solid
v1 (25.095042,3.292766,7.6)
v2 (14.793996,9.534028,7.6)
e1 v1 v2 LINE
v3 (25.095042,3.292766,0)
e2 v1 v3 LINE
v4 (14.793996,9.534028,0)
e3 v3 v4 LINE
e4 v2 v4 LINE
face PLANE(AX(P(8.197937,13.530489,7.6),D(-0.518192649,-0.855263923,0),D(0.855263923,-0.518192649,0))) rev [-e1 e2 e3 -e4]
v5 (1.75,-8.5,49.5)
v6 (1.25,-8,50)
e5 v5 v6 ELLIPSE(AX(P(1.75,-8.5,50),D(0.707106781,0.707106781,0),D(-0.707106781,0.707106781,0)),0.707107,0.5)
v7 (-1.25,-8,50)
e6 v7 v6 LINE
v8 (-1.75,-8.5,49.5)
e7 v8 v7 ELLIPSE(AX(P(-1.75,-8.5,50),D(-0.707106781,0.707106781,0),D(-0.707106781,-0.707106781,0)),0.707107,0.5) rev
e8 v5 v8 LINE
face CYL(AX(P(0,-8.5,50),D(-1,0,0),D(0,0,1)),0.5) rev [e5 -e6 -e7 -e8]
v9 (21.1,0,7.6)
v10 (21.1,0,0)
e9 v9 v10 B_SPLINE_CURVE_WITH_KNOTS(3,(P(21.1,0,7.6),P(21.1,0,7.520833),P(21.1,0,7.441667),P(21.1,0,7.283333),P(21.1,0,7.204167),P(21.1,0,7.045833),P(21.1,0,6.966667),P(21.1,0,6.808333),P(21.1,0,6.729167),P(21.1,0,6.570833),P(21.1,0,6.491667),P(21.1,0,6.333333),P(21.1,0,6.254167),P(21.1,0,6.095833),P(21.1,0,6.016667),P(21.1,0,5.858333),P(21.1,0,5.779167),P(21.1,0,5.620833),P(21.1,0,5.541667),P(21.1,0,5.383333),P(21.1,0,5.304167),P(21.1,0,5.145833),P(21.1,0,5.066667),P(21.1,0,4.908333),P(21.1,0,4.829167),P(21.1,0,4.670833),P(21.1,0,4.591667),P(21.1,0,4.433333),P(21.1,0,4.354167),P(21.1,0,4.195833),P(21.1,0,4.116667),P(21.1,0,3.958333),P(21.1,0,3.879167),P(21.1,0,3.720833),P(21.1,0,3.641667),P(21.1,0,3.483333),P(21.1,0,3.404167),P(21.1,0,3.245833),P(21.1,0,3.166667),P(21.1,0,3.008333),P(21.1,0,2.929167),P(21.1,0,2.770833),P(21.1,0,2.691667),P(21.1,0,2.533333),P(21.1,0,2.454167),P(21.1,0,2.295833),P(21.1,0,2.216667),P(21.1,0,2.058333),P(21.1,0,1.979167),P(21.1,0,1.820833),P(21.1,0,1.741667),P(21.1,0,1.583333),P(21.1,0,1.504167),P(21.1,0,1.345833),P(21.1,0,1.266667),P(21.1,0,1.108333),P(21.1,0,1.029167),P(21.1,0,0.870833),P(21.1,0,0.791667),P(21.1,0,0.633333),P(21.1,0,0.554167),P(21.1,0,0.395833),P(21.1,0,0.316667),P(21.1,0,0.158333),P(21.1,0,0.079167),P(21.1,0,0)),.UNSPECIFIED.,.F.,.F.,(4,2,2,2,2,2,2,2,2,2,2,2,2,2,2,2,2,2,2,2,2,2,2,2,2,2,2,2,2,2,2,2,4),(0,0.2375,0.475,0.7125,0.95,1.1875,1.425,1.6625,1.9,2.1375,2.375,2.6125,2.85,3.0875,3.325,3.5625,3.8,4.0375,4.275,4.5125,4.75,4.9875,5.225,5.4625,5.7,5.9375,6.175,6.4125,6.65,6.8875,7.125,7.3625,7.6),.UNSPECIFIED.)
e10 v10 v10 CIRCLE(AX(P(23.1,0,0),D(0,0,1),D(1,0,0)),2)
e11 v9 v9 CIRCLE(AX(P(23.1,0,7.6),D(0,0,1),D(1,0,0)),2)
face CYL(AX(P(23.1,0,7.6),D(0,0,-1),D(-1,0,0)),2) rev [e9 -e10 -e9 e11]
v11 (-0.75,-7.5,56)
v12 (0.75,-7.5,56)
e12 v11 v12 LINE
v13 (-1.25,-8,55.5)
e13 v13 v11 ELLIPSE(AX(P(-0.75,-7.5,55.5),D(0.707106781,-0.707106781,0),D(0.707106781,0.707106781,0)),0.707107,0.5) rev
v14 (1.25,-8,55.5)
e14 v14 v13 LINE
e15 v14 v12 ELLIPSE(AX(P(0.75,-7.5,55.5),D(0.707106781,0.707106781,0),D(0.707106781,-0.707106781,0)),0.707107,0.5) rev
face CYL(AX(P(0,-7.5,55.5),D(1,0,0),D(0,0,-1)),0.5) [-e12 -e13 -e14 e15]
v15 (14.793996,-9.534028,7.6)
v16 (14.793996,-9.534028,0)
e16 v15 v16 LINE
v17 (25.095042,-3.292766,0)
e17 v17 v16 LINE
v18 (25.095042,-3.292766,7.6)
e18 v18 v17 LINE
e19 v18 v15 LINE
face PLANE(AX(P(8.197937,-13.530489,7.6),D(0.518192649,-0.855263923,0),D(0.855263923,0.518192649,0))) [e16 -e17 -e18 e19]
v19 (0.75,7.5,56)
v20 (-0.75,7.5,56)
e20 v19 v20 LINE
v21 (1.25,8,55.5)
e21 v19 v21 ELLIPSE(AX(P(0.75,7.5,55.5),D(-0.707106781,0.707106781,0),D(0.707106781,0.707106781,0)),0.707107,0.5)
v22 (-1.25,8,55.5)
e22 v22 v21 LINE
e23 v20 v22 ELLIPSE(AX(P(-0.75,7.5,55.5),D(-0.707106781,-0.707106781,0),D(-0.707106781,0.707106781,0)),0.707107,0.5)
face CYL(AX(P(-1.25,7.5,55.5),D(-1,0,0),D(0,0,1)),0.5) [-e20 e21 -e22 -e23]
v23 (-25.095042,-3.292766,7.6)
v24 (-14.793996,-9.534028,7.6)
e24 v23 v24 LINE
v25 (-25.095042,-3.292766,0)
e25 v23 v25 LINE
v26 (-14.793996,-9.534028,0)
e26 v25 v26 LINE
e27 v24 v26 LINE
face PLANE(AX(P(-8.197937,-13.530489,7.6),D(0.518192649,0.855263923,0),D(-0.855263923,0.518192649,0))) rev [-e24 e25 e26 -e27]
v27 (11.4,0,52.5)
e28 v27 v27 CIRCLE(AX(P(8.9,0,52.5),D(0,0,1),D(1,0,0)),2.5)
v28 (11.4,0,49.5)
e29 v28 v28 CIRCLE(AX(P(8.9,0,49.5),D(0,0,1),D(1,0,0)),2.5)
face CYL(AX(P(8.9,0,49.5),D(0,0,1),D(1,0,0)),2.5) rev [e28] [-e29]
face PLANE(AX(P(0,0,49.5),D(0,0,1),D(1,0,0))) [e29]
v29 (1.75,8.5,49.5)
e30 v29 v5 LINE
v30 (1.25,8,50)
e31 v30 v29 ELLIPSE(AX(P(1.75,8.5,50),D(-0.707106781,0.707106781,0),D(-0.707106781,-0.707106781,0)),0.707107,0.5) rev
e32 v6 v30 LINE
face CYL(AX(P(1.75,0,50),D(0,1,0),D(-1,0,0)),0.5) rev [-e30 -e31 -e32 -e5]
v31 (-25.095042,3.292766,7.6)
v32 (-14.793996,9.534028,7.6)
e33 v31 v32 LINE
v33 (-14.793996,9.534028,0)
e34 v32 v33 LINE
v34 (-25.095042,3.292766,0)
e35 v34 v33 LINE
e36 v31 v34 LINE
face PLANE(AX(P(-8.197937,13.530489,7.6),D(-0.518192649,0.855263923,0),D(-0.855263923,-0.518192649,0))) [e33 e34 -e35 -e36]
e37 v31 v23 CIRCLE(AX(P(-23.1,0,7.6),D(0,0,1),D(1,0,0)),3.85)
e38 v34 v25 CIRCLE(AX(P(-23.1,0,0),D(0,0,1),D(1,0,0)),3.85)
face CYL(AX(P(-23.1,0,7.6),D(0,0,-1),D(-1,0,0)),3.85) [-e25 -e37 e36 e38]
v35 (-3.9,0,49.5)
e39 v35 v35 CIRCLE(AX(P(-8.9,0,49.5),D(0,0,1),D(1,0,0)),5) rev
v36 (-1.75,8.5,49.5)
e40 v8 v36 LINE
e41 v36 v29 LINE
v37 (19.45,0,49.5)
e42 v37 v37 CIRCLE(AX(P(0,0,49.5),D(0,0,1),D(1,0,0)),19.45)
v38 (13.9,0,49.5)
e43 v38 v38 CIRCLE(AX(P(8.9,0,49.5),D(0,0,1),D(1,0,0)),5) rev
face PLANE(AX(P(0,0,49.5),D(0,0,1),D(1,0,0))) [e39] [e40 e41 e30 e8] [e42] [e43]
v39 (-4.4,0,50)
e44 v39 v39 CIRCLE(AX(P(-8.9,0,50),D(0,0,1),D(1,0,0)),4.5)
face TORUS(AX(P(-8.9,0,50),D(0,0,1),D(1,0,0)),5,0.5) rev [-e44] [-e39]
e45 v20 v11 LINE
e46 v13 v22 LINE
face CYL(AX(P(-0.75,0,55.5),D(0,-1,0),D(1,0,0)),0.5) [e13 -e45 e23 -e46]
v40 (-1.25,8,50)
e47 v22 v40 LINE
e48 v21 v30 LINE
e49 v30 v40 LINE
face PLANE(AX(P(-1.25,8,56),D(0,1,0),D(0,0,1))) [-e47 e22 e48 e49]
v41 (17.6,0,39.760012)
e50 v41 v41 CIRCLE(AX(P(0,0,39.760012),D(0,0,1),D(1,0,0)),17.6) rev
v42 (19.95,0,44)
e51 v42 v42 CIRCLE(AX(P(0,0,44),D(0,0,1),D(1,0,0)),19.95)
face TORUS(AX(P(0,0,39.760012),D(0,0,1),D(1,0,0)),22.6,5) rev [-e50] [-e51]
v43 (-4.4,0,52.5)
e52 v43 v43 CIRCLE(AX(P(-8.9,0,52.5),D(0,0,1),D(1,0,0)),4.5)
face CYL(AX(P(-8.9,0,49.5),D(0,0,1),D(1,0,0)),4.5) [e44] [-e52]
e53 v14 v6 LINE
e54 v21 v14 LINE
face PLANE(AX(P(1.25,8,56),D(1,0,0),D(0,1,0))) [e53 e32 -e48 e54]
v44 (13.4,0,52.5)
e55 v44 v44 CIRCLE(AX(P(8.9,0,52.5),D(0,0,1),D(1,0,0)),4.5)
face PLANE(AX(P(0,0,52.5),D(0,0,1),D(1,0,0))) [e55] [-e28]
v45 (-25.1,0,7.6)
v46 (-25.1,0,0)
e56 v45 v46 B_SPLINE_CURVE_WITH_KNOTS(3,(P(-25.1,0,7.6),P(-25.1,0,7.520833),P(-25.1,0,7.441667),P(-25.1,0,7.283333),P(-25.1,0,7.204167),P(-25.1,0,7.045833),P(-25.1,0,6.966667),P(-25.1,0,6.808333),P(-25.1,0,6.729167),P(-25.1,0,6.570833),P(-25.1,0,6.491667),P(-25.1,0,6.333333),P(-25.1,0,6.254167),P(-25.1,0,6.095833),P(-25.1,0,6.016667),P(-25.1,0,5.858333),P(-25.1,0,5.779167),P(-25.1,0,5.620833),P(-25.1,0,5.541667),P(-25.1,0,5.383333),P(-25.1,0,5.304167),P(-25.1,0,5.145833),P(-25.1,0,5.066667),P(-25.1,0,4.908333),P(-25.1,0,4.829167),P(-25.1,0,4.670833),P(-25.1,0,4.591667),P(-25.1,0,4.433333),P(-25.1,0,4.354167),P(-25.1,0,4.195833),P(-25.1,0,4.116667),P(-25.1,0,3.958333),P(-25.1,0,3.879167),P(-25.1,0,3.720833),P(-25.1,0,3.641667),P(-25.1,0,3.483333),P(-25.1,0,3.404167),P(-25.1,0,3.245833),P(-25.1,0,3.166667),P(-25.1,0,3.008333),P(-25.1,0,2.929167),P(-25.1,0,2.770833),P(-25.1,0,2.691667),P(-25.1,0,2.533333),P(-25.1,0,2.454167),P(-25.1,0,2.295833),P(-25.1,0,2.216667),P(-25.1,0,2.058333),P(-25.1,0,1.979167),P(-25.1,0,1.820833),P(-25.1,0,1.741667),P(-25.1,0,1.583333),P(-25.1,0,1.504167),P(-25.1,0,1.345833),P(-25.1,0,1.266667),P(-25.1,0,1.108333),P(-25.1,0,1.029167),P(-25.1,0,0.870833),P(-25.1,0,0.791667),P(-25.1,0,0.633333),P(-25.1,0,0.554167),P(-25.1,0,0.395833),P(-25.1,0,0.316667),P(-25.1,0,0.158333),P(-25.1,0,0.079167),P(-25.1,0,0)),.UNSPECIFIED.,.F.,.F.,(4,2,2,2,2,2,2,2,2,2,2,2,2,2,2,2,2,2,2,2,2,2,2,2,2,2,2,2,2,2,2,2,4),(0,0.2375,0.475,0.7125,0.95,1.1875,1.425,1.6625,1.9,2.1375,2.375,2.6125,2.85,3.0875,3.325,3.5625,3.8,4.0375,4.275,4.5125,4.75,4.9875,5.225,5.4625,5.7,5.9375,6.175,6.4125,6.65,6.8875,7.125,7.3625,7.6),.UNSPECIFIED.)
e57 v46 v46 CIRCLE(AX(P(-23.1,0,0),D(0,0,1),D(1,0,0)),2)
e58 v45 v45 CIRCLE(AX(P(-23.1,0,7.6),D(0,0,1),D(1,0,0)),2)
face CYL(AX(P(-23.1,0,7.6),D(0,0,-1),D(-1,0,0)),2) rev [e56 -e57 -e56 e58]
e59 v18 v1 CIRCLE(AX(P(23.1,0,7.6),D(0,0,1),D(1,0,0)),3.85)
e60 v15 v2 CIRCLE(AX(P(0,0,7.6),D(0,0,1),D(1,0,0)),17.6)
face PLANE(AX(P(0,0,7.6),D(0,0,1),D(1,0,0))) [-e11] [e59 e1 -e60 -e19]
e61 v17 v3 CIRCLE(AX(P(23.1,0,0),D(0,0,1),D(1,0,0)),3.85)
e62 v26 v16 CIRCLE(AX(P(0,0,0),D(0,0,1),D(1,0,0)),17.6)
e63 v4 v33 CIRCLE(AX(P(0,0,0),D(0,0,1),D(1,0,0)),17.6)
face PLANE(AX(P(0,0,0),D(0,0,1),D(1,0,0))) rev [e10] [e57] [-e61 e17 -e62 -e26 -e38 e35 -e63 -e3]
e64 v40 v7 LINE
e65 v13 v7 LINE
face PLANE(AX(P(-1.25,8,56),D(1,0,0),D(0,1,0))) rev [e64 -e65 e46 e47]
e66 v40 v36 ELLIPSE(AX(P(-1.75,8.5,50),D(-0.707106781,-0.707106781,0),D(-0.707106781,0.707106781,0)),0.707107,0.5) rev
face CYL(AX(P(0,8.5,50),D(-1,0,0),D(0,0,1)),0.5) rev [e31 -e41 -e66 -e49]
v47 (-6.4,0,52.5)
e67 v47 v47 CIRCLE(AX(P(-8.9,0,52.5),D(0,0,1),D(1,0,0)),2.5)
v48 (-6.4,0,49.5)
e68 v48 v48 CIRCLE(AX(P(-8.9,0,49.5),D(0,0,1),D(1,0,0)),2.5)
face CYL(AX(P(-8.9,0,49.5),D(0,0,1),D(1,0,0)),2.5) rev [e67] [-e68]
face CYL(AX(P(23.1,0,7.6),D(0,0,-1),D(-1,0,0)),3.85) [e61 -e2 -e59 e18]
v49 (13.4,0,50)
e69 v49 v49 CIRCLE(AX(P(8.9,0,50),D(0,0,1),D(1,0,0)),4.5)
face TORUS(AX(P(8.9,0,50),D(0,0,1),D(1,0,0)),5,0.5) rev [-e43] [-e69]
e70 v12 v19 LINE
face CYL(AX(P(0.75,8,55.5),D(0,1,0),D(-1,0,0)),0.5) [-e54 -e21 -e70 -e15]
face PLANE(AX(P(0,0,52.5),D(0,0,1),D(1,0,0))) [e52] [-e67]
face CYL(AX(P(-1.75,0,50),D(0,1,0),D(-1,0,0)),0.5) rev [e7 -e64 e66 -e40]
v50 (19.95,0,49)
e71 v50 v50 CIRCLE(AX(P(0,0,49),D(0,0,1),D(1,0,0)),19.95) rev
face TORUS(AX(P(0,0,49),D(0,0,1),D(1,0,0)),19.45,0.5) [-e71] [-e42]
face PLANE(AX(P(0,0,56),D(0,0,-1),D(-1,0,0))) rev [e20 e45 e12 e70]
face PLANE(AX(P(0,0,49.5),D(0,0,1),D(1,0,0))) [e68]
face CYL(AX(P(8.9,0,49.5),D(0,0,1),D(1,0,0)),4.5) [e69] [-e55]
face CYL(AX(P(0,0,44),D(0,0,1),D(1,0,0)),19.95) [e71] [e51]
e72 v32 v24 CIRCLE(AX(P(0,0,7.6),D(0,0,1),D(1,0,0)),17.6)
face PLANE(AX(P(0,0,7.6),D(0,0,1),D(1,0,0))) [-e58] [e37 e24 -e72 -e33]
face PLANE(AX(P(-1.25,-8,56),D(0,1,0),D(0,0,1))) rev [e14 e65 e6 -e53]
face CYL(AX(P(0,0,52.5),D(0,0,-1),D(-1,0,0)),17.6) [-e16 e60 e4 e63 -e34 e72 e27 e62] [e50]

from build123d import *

# Parameters (mm, degrees)
SKETCH2_R           = 17.6
BOSS_EXTRUDE1_DEPTH = 52.5
SKETCH3_R           = 2
BOSS_EXTRUDE2_DEPTH = 7.6
SKETCH4_W           = 2.5
SKETCH4_H           = 16
BOSS_EXTRUDE3_DEPTH = 3.5
CUT_EXTRUDE1_START  = -3
SKETCH5_R           = 17.6
SKETCH5_R_2         = 4.5
SKETCH5_W           = 2.5
SKETCH5_H           = 16
SKETCH5_R_3         = 2.5
CUT_EXTRUDE1_DEPTH  = 3
SKETCH7_R           = 19.95
BOSS_EXTRUDE5_DEPTH = 5.5
FILLET3_R           = 5
FILLET4_R           = 0.5


with BuildPart() as part:
    # Sketch2 → Boss-Extrude1 (new body)
    with BuildSketch(Plane.XY):
        Circle(SKETCH2_R)
    extrude(amount=BOSS_EXTRUDE1_DEPTH)

    # Sketch3 → Boss-Extrude2 (add)
    # profile 1 of 2: a face of its own
    with BuildSketch(Plane.XY):
        with BuildLine():
            Line((-14.793995556, 9.534028294), (-25.095041698, 3.292766105))
            ThreePointArc((-25.095041698, 3.292766105), (-26.95, 0), (-25.095041698, -3.292766105))
            Line((-25.095041698, -3.292766105), (-14.793995556, -9.534028294))
            ThreePointArc((-14.793995556, -9.534028294), (-17.6, 0), (-14.793995556, 9.534028294))
        make_face()
        with Locations(Location((-23.1, 0, 0), (0, 0, 180))):
            Circle(SKETCH3_R, mode=Mode.SUBTRACT)
    # profile 2 of 2: a face of its own
    with BuildSketch(Plane.XY):
        with BuildLine():
            Line((25.095041698, 3.292766105), (14.793995556, 9.534028294))
            ThreePointArc((14.793995556, 9.534028294), (17.6, 0), (14.793995556, -9.534028294))
            Line((14.793995556, -9.534028294), (25.095041698, -3.292766105))
            ThreePointArc((25.095041698, -3.292766105), (26.95, 0), (25.095041698, 3.292766105))
        make_face()
        with Locations(Location((23.1, 0, 0), (0, 0, 180))):
            Circle(SKETCH3_R, mode=Mode.SUBTRACT)
    extrude(amount=BOSS_EXTRUDE2_DEPTH)

    # Sketch4 → Boss-Extrude3 (add)
    with BuildSketch(Plane.XY.offset(52.5)):
        Rectangle(SKETCH4_W, SKETCH4_H)
    extrude(amount=BOSS_EXTRUDE3_DEPTH)

    # Sketch5 → Cut-Extrude1 (cut)
    # profile 1 of 3: a face of its own
    with BuildSketch(Plane.XY.offset(52.5).offset(CUT_EXTRUDE1_START)):
        with Locations(Location((0, 0, 0), (0, 0, 147.200140228))):
            Circle(SKETCH5_R)
        with Locations((-8.9, 0)):
            Circle(SKETCH5_R_2, mode=Mode.SUBTRACT)
        with Locations((8.9, 0)):
            Circle(SKETCH5_R_2, mode=Mode.SUBTRACT)
        Rectangle(SKETCH5_W, SKETCH5_H, mode=Mode.SUBTRACT)
    # profile 2 of 3: a face of its own
    with BuildSketch(Plane.XY.offset(52.5).offset(CUT_EXTRUDE1_START)):
        with Locations((-8.9, 0)):
            Circle(SKETCH5_R_3)
    # profile 3 of 3: a face of its own
    with BuildSketch(Plane.XY.offset(52.5).offset(CUT_EXTRUDE1_START)):
        with Locations((8.9, 0)):
            Circle(SKETCH5_R_3)
    extrude(amount=CUT_EXTRUDE1_DEPTH, mode=Mode.SUBTRACT)

    # Sketch7 → Boss-Extrude5 (add)
    with BuildSketch(Plane.XY.offset(49.5)):
        Circle(SKETCH7_R)
    extrude(amount=-BOSS_EXTRUDE5_DEPTH)

    # Fillet3
    # the kernel refuses this fillet: 5 mm, written as the material it adds along each edge
    with BuildSketch(Plane(origin=(0, 0, 44), x_dir=(1, 0, 0), z_dir=(0, 1, 0))) as fillet3_piece_1:
        with BuildLine():
            CenterArc((22.6, 4.239988208), FILLET3_R, 180, 57.994545172)
            Line((19.95, 0), (19.897, -0.084799764))
            ThreePointArc((19.897, -0.084799764), (18.775, -0.1), (17.6, -0.1))
            Line((17.6, -0.1), (17.5, 0))
            Line((17.5, 0), (17.5, 4.239988208))
            Line((17.5, 4.239988208), (17.6, 4.239988208))
        make_face()
    revolve(axis=Axis((0, 0, 44), (0, 0, -1)))

    # Fillet4
    fillet4_edges = [part.edges().sort_by_distance(p)[0] for p in [
        (1.25, 0, 56),
        (0, 8, 56),
        (0, -8, 56),
        (-1.25, 0, 56),
        (0, 8, 49.5),
        (-1.25, 0, 49.5),
        (0, -8, 49.5),
        (1.25, 0, 49.5),
        (-13.4, 0, 49.5),
        (4.4, 0, 49.5),
        (-19.95, 0, 49.5),
    ]]
    fillet(fillet4_edges, radius=FILLET4_R)


solid = part.part
